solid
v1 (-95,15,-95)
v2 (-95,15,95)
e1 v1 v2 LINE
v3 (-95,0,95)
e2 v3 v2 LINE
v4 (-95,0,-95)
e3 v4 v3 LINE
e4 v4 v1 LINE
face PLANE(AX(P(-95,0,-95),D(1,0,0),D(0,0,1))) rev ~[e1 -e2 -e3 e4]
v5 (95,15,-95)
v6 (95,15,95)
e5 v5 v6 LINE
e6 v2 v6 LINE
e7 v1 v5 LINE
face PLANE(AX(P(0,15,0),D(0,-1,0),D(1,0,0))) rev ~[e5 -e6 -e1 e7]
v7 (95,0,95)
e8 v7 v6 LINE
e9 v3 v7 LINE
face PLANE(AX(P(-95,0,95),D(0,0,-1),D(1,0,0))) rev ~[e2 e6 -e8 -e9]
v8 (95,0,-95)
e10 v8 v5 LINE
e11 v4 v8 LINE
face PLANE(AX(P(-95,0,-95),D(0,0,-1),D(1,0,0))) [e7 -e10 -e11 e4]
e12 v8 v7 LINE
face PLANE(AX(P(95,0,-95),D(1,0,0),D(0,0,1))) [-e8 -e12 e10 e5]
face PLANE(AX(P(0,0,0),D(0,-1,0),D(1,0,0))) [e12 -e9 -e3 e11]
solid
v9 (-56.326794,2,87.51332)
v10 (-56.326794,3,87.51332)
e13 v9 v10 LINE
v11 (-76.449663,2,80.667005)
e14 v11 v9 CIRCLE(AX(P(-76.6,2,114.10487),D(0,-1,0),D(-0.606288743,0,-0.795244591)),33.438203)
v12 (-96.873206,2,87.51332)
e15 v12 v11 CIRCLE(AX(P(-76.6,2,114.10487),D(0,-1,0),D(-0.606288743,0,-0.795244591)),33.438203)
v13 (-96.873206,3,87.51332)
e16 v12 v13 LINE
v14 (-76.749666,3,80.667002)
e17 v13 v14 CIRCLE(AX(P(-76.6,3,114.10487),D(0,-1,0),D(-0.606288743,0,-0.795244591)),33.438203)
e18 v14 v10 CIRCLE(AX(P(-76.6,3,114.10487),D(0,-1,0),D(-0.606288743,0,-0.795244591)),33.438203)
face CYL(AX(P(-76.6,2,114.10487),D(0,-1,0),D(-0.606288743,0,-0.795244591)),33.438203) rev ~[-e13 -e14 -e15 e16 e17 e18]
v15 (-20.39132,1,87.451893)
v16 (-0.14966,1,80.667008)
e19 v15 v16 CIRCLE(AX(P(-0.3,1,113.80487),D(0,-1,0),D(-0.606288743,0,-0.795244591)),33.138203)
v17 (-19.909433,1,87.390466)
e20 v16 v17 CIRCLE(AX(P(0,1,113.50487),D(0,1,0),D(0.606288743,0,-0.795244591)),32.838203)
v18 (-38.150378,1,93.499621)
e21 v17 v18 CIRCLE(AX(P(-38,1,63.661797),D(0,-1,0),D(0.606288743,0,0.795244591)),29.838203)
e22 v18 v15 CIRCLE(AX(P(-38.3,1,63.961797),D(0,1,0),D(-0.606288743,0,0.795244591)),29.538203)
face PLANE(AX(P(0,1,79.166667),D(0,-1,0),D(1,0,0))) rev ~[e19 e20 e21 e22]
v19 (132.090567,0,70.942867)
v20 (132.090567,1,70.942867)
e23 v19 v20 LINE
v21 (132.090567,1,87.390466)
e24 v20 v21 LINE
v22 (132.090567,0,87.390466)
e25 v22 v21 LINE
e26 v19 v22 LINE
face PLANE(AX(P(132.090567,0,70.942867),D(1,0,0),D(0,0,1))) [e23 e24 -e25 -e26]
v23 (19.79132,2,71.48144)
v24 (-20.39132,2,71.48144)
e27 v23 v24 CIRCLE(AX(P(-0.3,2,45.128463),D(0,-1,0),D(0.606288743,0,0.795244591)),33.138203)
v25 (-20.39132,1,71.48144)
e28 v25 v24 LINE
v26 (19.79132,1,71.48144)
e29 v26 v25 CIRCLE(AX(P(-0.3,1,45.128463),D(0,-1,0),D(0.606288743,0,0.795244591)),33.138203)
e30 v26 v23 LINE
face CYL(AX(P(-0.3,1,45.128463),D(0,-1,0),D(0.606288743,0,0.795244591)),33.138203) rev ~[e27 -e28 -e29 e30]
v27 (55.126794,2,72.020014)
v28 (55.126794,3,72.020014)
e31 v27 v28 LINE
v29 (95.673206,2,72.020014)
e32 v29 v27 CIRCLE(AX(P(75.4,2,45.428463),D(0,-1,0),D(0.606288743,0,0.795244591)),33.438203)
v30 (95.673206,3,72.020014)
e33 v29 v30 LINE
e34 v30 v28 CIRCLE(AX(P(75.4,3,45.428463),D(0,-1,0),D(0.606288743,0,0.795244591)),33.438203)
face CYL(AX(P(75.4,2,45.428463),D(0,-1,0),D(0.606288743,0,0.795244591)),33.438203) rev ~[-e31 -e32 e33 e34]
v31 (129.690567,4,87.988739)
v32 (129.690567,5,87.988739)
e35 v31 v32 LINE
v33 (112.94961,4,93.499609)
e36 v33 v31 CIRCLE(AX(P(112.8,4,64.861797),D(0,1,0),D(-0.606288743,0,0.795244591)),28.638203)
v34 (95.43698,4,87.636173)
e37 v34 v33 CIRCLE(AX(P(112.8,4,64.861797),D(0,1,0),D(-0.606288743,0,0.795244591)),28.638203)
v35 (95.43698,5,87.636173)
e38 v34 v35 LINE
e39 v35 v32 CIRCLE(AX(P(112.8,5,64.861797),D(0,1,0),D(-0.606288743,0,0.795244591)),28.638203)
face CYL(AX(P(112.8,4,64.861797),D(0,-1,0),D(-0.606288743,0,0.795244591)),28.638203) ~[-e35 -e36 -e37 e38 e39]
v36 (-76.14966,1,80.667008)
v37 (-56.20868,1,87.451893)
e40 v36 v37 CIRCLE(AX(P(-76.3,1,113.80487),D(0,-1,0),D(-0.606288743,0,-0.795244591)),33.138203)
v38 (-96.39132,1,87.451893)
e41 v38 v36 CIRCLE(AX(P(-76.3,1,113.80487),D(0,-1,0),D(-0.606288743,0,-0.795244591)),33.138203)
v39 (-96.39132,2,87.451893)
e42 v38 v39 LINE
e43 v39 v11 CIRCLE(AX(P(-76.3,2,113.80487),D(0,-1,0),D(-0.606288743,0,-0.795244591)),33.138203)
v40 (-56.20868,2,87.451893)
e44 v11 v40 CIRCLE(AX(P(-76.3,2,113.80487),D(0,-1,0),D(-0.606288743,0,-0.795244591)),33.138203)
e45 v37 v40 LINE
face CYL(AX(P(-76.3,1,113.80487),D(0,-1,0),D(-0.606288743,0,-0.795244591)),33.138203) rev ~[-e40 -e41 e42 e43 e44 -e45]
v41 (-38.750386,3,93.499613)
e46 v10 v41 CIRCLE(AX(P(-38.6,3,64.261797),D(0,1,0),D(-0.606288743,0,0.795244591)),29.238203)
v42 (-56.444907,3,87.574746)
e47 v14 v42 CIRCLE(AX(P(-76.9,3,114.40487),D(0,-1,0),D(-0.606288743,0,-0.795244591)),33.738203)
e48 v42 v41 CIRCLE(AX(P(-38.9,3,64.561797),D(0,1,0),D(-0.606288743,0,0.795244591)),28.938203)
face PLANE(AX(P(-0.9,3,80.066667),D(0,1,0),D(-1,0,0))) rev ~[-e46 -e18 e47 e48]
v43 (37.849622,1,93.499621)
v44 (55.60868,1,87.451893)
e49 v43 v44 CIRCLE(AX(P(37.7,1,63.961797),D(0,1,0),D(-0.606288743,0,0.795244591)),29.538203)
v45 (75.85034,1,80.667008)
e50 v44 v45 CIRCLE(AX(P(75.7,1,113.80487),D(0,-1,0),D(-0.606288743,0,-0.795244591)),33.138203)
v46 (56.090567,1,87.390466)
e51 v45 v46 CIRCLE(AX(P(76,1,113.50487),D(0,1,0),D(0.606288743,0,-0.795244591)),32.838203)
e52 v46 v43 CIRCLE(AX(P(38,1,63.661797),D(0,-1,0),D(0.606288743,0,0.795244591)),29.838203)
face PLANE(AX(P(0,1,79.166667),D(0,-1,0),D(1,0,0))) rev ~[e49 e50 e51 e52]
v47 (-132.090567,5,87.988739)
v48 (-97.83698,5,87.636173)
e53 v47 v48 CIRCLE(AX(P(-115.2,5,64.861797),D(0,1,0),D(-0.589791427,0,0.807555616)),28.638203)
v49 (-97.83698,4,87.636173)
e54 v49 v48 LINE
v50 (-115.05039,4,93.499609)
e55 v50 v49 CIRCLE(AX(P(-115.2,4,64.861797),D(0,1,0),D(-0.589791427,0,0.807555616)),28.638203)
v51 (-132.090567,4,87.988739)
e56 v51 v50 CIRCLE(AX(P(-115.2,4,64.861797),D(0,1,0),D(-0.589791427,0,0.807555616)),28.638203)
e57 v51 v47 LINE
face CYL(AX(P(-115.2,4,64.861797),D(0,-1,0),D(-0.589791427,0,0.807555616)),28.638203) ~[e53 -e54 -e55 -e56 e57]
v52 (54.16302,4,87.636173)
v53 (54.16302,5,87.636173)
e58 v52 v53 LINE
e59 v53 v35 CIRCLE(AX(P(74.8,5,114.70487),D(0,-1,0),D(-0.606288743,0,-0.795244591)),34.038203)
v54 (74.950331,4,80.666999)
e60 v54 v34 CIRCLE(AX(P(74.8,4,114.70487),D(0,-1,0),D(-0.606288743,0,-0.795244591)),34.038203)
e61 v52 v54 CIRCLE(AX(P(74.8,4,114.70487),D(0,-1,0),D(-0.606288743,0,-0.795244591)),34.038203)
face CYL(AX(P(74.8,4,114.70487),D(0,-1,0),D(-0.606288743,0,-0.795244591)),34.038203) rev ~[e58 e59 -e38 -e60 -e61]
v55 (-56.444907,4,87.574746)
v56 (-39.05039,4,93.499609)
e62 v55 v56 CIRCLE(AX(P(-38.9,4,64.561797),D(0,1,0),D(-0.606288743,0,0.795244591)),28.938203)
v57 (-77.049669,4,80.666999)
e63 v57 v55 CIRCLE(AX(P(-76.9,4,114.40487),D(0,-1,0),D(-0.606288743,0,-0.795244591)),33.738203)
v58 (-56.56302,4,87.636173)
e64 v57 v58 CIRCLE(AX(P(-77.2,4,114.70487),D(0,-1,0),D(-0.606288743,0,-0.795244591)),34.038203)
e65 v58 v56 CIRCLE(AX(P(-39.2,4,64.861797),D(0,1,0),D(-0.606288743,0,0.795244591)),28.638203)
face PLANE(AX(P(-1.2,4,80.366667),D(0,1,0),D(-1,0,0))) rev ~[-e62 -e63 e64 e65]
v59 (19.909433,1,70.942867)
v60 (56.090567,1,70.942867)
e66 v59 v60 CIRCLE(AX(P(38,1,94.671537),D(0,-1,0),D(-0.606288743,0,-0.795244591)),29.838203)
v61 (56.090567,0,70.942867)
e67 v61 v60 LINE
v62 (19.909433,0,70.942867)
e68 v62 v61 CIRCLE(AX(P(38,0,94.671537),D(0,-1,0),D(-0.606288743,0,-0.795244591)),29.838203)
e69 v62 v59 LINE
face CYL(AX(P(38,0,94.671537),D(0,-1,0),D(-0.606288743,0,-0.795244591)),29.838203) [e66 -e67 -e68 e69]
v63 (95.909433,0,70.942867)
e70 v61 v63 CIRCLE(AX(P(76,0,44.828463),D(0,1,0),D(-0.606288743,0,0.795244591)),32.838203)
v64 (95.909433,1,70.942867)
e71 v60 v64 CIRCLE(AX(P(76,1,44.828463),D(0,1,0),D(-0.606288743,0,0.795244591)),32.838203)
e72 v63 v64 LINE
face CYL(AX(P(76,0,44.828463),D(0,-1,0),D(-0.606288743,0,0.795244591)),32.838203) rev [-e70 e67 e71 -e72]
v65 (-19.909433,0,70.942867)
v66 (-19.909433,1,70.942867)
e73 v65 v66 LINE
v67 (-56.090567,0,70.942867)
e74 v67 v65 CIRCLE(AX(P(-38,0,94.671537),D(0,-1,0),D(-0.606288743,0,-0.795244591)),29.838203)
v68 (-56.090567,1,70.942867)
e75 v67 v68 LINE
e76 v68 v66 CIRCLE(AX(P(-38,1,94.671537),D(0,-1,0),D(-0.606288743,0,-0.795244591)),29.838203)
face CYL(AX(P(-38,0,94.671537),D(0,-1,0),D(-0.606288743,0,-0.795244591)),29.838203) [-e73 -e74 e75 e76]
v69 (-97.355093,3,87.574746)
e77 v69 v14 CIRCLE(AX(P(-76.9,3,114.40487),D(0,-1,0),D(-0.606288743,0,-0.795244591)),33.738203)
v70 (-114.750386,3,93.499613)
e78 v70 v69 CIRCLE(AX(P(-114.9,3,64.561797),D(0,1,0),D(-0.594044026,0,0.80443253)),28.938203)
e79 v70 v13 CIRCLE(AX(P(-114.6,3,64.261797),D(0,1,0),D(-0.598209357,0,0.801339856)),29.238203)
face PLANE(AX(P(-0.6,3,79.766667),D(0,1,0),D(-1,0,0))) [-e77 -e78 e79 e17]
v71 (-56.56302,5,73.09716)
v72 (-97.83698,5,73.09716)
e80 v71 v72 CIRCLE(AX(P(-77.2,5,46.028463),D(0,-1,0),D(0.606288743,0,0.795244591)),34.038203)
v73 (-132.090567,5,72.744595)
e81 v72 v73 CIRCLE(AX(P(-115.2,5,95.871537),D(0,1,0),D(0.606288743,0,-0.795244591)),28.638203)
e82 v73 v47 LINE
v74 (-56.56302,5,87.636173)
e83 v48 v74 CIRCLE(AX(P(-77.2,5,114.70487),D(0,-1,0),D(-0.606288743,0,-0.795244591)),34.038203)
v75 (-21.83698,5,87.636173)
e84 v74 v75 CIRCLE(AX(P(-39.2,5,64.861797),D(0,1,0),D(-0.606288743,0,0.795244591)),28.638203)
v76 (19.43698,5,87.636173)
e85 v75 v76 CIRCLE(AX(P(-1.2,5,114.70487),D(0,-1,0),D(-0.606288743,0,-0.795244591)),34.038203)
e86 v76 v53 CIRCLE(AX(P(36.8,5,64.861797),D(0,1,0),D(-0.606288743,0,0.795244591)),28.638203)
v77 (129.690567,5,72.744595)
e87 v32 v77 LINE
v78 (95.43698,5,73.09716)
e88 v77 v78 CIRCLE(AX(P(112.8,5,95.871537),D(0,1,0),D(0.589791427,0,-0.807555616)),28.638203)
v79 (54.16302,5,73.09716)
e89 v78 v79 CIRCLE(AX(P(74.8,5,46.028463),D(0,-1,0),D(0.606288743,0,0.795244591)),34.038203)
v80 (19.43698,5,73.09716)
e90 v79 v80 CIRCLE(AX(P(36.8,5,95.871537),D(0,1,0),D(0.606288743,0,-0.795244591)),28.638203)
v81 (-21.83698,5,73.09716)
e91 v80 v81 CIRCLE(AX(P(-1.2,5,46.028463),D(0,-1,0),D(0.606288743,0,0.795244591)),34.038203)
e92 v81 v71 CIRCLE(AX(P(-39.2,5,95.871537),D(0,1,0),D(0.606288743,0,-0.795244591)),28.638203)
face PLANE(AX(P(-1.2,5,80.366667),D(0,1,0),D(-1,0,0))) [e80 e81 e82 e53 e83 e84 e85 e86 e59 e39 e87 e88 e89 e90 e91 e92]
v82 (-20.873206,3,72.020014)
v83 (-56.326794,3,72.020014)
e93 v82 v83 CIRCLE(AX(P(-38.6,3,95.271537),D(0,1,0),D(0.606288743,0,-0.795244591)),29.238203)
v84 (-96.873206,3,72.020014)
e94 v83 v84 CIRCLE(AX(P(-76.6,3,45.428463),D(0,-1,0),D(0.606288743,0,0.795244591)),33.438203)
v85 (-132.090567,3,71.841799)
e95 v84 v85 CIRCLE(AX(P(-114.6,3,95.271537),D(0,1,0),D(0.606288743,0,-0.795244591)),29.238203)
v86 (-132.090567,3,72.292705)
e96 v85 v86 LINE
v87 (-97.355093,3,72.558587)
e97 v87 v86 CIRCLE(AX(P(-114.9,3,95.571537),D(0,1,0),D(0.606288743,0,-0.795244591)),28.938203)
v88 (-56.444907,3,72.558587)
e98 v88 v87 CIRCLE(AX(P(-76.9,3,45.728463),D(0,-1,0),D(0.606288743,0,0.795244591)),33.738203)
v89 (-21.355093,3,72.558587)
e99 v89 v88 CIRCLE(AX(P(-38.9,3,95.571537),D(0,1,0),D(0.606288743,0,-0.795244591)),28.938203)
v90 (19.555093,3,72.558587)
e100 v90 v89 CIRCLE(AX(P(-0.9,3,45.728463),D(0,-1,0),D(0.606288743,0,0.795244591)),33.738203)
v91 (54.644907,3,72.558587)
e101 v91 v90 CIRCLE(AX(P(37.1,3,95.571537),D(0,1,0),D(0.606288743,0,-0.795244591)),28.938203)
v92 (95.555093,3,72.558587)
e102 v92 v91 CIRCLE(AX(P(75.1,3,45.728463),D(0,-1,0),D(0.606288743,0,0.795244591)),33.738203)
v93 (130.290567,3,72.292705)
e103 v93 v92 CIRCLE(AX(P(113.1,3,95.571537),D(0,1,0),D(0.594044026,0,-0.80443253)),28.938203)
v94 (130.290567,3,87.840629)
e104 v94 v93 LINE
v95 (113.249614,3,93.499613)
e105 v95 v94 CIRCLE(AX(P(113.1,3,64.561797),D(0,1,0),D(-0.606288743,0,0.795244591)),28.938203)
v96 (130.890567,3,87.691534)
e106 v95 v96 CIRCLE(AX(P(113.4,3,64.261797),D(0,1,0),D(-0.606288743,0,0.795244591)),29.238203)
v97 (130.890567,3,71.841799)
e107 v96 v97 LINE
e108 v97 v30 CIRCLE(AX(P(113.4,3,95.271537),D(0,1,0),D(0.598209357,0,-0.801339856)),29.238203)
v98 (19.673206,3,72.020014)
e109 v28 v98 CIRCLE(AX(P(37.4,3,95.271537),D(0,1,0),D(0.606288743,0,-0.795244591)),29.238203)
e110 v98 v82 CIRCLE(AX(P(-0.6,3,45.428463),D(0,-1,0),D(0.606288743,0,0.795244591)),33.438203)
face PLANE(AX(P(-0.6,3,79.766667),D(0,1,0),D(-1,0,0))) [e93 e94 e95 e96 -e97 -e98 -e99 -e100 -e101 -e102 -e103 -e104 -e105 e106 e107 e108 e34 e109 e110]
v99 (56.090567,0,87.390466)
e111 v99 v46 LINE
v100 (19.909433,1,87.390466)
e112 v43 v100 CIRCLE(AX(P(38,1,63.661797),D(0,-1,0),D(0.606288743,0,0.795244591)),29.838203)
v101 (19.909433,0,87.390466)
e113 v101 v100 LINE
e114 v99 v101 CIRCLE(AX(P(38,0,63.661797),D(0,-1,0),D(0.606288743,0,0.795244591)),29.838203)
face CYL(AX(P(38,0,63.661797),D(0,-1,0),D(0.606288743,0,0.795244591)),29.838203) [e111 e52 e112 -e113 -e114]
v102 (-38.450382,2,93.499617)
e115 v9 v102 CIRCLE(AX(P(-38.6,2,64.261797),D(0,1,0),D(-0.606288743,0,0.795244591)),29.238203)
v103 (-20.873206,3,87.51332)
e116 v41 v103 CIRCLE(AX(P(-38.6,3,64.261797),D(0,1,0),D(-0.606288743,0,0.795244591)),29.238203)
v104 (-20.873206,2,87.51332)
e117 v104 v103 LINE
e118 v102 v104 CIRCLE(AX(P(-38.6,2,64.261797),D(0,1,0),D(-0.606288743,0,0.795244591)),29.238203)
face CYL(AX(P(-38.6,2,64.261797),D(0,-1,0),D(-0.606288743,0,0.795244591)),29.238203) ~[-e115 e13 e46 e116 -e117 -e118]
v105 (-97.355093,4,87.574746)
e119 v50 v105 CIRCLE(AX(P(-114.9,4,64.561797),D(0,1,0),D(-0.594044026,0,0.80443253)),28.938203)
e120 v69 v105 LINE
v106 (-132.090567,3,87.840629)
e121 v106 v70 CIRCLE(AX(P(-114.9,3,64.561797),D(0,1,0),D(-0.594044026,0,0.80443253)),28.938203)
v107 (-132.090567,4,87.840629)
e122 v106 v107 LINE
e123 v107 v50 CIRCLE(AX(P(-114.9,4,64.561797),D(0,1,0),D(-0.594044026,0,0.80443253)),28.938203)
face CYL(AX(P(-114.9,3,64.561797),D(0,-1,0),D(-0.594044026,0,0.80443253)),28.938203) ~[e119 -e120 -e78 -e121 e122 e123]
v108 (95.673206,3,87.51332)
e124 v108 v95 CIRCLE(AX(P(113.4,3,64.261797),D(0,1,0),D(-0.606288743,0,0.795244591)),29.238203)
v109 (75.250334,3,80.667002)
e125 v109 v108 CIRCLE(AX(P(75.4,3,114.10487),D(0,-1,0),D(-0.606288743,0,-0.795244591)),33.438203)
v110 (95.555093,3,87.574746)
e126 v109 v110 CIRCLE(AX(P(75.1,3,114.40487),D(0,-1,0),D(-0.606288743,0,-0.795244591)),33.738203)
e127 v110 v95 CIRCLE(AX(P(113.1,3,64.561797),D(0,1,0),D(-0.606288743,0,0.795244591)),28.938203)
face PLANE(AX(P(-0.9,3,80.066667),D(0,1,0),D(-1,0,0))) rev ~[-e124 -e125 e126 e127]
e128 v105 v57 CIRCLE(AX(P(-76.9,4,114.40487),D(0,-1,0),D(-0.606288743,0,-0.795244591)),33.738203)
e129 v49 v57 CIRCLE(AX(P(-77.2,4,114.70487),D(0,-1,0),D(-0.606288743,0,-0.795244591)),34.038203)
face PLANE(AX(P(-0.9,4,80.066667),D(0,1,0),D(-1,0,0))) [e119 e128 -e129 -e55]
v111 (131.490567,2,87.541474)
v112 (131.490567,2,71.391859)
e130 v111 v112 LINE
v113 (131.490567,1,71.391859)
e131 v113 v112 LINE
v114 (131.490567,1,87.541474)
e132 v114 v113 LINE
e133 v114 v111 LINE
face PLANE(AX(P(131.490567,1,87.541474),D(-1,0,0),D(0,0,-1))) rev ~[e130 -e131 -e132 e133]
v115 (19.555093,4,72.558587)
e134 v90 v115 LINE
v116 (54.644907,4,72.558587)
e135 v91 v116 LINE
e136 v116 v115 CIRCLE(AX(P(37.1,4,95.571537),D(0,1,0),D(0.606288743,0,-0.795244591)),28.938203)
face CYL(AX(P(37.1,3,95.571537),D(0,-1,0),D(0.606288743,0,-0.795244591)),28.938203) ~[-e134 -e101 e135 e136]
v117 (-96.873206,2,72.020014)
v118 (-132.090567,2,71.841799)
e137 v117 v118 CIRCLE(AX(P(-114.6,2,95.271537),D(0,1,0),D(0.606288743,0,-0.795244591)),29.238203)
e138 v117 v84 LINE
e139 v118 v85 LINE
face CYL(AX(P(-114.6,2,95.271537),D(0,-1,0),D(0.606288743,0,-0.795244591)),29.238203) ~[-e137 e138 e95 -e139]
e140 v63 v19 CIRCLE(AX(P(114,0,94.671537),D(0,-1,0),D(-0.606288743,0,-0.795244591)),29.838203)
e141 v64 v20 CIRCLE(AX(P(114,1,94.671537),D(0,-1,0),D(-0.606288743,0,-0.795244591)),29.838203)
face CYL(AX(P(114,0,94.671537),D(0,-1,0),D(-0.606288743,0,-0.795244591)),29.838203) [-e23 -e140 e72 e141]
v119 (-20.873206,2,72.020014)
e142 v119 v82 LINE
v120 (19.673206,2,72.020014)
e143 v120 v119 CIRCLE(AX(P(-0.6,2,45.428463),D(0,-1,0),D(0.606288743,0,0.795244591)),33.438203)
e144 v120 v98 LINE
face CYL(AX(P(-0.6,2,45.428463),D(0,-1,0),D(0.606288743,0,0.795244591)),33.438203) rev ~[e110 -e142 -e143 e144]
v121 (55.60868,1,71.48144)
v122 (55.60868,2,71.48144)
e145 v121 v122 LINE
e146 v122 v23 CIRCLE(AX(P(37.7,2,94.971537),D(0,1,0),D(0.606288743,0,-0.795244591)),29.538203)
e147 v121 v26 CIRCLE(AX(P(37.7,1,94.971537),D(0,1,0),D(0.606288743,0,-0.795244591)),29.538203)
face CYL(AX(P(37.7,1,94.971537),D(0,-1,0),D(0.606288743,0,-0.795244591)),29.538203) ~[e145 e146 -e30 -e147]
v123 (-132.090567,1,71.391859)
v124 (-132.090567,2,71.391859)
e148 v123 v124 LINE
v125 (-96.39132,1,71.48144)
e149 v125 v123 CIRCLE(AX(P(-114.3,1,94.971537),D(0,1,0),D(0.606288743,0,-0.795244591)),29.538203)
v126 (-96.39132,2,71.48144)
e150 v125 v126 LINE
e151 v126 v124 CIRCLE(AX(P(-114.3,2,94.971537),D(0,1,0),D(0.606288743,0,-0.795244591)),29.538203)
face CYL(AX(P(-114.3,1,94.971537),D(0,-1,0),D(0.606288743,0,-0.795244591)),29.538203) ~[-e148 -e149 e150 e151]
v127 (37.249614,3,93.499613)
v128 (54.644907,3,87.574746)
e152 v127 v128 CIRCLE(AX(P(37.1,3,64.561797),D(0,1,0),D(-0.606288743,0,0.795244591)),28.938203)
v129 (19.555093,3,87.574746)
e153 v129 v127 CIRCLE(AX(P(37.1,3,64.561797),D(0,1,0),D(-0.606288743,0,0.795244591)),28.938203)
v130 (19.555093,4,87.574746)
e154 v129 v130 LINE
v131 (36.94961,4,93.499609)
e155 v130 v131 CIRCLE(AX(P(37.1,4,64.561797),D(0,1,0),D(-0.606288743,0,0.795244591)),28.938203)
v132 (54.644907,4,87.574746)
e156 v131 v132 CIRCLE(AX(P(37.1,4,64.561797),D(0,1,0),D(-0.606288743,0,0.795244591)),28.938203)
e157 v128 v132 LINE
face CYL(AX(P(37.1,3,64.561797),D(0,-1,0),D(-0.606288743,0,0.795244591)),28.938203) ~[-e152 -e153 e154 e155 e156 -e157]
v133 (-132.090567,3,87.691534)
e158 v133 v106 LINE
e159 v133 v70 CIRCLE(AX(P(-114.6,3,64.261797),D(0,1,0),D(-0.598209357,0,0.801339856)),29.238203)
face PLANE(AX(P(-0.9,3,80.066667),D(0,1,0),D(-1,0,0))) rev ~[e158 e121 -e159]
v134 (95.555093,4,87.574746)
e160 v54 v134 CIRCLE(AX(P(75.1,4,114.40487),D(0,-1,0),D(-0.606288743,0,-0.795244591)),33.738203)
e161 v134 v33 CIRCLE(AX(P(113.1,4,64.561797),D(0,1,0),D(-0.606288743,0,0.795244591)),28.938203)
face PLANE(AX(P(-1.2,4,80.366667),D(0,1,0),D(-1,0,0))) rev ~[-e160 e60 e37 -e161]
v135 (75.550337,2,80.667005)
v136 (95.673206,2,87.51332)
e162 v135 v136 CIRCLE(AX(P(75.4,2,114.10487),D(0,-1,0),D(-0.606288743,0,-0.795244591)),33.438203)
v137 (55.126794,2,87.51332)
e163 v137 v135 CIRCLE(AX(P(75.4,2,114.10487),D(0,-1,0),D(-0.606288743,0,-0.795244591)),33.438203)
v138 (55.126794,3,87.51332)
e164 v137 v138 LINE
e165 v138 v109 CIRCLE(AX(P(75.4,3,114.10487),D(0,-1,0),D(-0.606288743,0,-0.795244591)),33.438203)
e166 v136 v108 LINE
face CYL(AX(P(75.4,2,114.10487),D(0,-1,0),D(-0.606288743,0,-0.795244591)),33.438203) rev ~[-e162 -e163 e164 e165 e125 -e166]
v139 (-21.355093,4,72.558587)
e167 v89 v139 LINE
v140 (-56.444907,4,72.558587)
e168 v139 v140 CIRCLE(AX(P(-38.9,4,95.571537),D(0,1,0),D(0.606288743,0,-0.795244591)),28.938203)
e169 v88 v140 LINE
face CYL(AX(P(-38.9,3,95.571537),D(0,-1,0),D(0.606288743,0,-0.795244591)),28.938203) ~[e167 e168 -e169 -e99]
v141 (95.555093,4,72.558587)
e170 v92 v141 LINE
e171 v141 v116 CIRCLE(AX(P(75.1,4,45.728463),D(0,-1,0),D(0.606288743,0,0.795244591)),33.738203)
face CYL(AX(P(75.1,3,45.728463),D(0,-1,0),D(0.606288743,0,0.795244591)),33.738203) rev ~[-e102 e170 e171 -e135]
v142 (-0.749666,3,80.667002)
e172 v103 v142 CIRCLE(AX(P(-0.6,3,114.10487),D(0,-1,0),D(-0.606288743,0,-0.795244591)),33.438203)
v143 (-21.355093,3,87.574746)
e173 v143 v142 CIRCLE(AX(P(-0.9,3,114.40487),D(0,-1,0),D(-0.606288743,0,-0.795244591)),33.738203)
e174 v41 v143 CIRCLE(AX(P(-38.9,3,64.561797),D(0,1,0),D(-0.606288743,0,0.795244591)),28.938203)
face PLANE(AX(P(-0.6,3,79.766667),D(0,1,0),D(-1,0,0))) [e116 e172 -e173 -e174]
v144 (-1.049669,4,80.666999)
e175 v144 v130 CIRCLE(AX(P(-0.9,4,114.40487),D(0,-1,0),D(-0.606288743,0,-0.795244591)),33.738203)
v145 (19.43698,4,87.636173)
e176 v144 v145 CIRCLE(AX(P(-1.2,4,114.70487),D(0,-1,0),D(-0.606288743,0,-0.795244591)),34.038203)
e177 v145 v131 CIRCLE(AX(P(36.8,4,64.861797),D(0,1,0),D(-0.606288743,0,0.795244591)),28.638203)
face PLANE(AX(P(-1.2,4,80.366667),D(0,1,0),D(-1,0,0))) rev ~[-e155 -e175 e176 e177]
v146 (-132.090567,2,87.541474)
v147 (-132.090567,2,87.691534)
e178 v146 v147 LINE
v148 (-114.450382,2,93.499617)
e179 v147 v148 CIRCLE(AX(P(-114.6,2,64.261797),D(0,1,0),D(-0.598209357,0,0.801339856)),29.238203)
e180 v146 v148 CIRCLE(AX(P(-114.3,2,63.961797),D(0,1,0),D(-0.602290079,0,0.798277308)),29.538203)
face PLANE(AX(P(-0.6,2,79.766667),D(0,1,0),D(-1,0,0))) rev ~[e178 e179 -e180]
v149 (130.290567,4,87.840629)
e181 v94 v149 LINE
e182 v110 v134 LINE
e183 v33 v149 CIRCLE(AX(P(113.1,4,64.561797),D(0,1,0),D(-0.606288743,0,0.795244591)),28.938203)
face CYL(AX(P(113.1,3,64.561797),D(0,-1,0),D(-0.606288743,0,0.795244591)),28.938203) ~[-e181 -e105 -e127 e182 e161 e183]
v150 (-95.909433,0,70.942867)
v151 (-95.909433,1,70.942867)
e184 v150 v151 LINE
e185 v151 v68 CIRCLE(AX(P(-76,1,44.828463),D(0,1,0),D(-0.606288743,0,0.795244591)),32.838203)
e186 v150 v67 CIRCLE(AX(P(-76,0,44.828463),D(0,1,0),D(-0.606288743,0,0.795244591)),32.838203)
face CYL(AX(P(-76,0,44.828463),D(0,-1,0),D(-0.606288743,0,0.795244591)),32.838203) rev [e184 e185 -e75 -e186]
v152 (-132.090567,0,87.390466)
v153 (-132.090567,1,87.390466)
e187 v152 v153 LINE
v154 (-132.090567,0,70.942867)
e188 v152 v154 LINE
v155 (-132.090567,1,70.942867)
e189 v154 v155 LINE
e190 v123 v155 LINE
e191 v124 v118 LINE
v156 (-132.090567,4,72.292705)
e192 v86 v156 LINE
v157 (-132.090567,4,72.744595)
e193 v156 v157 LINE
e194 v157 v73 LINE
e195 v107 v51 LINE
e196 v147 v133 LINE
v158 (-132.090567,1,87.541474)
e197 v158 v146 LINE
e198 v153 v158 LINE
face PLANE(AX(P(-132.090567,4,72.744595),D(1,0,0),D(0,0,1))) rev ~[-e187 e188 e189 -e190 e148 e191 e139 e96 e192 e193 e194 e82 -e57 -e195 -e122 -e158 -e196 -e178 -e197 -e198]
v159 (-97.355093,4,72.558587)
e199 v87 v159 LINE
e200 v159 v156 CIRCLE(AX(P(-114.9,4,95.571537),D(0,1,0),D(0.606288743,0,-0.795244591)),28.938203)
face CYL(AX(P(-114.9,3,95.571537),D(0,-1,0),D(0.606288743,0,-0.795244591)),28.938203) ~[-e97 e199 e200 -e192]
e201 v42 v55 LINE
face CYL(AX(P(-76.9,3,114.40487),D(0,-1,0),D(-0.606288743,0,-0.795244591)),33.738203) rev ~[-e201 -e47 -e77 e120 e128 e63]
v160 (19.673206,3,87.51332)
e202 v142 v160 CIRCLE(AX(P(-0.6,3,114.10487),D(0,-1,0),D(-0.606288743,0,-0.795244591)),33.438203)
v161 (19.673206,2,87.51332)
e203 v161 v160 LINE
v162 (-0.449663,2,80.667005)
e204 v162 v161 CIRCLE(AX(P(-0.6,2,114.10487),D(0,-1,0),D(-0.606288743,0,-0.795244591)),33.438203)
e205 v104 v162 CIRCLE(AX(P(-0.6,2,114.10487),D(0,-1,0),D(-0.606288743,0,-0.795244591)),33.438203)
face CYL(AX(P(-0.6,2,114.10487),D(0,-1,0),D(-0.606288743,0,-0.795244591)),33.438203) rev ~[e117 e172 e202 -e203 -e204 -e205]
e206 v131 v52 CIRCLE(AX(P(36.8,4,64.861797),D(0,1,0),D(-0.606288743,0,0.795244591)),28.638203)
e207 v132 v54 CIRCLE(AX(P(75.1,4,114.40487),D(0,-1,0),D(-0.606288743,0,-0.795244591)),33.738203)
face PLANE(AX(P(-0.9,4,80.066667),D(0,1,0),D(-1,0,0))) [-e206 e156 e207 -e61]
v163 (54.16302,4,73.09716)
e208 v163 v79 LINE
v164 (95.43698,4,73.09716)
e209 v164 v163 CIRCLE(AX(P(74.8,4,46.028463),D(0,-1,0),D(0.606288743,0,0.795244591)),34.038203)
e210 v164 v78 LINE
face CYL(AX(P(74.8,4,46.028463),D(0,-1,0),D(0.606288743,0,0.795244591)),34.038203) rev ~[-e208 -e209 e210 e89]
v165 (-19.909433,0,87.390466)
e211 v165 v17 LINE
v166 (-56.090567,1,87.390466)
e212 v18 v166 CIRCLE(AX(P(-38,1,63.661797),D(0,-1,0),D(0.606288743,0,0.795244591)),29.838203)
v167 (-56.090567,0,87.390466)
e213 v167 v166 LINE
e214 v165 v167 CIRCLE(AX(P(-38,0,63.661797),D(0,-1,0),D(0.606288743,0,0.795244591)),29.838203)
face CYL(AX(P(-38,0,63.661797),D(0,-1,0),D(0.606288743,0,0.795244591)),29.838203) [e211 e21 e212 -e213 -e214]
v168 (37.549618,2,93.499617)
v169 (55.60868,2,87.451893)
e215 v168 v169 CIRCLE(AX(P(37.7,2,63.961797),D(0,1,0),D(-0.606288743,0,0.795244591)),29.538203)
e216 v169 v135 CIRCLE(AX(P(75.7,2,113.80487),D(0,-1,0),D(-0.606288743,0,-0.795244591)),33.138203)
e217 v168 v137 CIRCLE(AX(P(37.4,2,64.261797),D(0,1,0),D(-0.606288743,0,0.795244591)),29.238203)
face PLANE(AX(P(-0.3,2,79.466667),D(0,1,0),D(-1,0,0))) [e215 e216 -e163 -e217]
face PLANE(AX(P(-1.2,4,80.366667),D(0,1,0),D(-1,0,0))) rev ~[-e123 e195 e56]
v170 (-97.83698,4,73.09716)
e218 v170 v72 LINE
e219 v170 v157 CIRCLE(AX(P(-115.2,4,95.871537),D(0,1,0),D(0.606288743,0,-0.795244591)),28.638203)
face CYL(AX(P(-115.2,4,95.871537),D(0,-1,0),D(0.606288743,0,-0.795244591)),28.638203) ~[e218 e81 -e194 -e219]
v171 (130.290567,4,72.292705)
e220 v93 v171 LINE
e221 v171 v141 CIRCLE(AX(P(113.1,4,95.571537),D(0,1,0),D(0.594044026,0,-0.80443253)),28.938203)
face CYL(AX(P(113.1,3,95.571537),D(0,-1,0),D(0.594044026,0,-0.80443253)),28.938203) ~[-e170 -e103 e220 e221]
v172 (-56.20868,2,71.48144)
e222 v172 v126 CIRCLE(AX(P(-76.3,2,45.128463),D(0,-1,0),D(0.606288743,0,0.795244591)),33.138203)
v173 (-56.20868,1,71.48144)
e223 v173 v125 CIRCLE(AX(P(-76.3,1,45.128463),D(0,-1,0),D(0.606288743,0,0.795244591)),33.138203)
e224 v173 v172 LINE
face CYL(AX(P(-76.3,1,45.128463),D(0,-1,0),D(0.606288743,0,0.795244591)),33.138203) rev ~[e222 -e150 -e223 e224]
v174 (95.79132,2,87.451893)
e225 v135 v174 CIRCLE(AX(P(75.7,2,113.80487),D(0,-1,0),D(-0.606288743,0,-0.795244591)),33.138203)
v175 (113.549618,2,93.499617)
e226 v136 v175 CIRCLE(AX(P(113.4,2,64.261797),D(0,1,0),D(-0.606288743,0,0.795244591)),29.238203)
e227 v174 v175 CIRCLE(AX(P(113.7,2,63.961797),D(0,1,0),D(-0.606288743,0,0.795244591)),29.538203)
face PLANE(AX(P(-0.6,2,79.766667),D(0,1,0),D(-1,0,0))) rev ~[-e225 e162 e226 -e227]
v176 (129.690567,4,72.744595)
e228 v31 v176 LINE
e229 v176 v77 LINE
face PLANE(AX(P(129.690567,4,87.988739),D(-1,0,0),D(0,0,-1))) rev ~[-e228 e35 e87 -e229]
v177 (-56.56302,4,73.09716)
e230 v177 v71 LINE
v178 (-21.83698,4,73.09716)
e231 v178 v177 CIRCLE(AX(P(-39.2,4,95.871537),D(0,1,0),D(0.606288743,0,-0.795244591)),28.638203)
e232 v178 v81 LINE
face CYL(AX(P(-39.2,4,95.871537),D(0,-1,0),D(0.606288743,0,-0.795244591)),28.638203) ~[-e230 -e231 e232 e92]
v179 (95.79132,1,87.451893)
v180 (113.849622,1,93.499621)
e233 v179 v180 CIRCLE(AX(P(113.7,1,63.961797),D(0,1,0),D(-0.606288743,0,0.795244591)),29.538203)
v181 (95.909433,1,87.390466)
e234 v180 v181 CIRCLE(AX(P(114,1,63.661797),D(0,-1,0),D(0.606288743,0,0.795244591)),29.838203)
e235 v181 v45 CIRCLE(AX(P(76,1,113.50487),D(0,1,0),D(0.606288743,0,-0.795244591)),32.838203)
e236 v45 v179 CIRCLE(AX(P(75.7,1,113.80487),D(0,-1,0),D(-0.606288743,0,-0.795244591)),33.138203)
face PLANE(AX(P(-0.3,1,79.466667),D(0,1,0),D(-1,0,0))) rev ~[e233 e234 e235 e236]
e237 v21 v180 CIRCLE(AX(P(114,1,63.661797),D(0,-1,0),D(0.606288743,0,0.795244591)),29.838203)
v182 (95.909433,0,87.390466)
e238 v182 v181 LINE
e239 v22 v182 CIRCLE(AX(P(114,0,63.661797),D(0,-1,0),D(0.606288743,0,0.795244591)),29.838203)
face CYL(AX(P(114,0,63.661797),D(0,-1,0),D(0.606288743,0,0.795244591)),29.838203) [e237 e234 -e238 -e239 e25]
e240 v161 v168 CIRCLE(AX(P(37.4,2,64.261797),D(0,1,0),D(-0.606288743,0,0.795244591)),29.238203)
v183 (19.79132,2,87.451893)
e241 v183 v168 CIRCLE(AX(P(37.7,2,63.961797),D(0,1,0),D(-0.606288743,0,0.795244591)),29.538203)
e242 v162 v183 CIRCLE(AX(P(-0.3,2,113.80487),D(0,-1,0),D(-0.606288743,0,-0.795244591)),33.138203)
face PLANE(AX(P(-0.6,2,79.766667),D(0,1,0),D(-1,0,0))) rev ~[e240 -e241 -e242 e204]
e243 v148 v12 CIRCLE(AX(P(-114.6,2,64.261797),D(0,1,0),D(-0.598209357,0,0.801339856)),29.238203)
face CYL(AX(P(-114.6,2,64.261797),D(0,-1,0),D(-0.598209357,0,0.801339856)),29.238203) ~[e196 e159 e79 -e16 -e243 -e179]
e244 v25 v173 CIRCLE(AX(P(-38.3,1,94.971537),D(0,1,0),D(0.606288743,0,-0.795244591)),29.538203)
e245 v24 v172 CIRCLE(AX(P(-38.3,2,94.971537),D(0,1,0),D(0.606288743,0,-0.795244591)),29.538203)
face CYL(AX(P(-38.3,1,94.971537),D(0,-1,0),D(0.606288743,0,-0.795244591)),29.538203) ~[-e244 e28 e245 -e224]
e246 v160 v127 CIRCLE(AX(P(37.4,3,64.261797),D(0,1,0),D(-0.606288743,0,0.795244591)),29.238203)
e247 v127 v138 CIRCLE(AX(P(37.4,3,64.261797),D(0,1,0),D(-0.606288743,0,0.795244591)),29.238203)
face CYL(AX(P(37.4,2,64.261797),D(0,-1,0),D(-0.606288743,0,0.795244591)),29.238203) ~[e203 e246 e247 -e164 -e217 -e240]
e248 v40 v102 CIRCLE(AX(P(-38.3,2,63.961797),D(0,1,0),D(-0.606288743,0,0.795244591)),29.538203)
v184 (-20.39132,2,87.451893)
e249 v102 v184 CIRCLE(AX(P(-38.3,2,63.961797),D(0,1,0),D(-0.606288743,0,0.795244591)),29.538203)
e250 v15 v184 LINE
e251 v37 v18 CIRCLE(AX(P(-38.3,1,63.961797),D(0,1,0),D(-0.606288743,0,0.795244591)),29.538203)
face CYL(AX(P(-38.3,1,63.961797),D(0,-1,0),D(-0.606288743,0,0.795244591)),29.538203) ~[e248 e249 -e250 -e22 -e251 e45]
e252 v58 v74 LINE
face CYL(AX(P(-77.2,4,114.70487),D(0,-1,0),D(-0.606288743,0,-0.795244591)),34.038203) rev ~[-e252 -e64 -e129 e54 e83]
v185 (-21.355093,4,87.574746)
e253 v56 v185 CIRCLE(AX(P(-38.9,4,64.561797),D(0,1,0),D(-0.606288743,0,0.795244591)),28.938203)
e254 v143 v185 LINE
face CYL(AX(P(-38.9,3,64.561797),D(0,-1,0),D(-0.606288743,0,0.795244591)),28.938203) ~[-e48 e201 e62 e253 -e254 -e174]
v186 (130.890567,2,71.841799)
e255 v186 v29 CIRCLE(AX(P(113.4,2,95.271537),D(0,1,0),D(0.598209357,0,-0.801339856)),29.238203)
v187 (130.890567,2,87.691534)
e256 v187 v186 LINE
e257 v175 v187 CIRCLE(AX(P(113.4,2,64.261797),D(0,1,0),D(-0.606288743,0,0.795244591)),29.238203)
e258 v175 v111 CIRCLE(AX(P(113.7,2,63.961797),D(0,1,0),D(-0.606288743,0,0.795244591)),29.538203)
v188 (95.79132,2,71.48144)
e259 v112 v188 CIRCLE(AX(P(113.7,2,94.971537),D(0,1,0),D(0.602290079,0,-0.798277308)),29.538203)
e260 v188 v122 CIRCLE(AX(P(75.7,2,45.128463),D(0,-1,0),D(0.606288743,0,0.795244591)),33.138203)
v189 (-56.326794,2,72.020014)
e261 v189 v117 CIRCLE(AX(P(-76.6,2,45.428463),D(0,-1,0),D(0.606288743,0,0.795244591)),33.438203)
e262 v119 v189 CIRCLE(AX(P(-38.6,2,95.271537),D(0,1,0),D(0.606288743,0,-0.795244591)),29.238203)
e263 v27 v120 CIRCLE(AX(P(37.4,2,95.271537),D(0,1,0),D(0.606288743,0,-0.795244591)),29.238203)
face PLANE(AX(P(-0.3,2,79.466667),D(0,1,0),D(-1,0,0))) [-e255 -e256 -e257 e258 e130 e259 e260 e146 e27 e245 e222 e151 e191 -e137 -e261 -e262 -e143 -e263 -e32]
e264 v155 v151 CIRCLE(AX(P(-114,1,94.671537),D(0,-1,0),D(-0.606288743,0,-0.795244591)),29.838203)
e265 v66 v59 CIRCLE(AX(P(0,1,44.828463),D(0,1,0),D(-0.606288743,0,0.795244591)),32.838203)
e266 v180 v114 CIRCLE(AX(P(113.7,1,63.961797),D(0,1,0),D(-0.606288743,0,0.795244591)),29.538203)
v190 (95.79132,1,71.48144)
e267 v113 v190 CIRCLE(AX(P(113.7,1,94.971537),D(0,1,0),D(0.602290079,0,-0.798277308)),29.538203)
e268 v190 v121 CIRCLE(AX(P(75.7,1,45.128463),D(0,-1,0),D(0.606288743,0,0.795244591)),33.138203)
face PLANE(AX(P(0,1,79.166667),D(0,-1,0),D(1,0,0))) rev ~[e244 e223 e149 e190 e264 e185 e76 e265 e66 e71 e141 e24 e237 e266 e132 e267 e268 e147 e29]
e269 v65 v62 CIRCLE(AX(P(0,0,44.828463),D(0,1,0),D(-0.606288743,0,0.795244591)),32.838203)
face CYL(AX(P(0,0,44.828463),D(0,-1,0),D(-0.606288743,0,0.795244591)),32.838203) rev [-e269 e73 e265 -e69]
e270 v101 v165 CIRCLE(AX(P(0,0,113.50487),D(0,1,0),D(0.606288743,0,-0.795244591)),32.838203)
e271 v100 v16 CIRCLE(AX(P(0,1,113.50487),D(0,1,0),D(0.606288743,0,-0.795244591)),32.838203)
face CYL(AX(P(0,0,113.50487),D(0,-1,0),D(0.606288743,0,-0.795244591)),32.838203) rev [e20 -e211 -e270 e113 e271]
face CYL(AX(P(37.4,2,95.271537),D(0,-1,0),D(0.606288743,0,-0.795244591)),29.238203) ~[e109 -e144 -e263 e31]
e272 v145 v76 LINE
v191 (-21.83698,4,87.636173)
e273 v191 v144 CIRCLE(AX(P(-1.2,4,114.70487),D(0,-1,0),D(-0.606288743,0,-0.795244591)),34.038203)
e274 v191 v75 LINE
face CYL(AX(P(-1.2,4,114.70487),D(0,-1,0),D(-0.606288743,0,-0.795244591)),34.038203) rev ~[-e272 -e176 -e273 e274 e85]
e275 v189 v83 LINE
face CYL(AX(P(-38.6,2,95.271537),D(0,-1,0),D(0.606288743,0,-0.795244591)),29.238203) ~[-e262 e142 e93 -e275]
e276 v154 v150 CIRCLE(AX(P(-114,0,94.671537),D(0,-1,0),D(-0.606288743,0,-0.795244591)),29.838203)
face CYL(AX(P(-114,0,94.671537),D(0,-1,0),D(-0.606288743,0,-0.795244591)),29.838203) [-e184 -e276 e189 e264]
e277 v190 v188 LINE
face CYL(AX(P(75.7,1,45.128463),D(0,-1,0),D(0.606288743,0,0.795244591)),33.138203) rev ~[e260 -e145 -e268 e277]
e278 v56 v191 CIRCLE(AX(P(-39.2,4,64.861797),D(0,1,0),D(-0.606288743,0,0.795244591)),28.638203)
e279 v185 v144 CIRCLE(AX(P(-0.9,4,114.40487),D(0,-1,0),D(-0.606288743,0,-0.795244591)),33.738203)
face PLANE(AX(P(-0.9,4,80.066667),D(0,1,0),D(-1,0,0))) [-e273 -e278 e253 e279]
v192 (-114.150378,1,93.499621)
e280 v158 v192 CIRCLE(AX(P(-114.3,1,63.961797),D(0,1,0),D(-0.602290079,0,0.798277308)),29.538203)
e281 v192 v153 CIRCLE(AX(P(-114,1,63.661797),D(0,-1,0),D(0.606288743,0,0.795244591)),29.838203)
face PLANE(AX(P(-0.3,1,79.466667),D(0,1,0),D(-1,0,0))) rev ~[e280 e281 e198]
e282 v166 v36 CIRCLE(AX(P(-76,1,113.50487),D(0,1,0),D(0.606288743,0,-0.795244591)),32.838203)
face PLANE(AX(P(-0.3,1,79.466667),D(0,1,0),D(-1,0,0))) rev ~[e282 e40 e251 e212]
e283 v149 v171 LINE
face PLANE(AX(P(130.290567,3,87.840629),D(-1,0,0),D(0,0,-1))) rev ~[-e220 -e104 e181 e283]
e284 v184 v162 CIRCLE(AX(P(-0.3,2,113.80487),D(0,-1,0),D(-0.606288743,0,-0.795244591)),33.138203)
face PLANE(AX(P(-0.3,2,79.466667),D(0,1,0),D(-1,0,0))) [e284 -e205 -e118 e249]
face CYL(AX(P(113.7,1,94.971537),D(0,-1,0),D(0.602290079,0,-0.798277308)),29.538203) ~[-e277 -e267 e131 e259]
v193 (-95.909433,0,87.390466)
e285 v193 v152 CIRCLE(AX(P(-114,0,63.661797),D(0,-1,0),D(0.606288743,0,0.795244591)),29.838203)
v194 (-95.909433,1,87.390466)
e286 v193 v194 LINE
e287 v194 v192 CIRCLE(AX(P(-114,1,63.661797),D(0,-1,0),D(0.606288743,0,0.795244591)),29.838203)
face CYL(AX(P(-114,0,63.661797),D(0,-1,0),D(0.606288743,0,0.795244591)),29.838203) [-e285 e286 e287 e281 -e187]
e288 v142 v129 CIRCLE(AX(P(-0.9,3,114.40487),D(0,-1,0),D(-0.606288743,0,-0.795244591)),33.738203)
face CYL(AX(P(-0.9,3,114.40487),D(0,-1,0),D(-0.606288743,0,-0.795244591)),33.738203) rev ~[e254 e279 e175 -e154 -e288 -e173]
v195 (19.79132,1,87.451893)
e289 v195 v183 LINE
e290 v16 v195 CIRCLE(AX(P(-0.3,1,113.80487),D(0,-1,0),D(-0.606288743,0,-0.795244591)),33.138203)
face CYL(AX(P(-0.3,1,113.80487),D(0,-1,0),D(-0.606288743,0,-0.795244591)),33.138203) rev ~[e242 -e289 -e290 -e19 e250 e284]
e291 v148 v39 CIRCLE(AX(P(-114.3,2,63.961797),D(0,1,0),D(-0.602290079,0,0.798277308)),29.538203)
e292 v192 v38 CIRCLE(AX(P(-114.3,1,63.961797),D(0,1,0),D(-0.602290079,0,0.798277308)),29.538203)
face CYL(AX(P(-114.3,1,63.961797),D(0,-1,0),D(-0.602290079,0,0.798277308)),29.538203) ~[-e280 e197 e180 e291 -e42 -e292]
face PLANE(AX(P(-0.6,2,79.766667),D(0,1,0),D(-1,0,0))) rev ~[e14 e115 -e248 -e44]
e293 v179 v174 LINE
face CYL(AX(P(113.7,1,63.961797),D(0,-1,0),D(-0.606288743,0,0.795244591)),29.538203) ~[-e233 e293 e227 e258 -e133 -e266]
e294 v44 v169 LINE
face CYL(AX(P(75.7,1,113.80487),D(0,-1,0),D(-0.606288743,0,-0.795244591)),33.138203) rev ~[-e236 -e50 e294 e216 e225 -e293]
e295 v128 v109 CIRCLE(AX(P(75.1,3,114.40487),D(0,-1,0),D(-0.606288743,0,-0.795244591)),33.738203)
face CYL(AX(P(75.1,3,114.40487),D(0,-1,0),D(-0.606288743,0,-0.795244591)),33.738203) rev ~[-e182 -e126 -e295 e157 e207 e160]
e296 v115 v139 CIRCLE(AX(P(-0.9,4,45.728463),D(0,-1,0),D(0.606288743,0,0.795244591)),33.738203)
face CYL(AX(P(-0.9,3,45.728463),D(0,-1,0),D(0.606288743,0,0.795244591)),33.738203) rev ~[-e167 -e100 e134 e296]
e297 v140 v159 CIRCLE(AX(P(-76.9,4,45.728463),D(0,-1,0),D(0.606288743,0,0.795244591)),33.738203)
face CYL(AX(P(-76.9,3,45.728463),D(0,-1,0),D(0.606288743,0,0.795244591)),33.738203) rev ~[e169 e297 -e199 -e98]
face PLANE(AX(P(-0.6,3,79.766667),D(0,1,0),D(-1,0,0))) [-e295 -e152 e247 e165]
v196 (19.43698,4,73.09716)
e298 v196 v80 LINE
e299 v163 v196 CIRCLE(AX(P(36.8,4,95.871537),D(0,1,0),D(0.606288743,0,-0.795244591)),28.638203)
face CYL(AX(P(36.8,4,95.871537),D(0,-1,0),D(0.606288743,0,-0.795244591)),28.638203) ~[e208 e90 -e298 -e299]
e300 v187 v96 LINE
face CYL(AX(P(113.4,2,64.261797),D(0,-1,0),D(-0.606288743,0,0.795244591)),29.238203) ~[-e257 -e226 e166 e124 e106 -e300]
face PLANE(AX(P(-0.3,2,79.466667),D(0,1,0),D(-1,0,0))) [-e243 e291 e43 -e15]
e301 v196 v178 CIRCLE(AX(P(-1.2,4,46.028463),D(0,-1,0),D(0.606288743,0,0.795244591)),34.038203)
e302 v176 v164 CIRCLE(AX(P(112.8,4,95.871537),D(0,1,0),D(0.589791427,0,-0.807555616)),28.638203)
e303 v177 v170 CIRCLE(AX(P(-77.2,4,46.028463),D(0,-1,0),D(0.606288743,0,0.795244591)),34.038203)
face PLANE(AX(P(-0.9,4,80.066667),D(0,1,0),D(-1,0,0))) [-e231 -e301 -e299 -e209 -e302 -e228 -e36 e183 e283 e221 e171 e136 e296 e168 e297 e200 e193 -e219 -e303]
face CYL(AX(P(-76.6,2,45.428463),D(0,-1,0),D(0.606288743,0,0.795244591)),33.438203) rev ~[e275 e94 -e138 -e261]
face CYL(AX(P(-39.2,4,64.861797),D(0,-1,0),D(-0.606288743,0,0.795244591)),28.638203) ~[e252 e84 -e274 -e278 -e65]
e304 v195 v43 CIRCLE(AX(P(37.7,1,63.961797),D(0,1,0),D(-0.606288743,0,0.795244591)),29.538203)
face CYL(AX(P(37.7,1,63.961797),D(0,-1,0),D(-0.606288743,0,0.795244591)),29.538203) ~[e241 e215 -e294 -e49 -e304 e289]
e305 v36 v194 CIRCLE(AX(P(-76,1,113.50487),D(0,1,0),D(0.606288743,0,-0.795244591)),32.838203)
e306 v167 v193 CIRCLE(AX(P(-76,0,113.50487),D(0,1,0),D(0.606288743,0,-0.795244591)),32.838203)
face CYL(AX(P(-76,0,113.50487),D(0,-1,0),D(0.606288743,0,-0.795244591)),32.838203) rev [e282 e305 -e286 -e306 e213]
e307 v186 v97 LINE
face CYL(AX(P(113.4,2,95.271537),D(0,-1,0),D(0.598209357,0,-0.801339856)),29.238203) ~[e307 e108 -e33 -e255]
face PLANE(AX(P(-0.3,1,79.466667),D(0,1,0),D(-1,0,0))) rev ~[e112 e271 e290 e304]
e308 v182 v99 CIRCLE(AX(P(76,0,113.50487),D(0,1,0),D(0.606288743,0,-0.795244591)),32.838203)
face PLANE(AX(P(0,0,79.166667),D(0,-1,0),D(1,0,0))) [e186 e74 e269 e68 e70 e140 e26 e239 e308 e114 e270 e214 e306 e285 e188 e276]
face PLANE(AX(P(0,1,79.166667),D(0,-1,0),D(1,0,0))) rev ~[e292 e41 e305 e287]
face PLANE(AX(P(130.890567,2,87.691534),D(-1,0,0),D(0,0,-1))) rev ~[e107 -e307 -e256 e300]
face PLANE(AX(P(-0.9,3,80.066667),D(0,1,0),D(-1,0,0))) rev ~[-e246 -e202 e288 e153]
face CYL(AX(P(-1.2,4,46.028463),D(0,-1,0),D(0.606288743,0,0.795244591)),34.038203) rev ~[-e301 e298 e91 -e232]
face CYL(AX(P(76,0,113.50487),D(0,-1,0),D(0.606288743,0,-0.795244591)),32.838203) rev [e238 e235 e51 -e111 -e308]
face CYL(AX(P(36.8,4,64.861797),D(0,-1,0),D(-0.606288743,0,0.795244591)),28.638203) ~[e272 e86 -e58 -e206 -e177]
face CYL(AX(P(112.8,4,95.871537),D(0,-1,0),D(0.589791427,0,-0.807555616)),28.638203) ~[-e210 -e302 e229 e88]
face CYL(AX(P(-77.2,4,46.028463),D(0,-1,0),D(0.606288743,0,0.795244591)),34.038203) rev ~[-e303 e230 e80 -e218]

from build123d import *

# Parameters (mm, degrees)
F0_W      = 190
F0_H      = 190
F1_DEPTH  = 15
F3_DEPTH  = 1
F5_DEPTH  = 1
F7_DEPTH  = 1
F9_DEPTH  = 1
F11_DEPTH = 1


with BuildPart() as f1:
    # F0 (on Front) → F1 (new body)
    with BuildSketch(Plane.XZ):
        Rectangle(F0_W, F0_H)
    extrude(amount=-F1_DEPTH)


with BuildPart() as f3:
    # F2 (on face) → F3 (new body)
    with BuildSketch(Plane.XZ):
        with BuildLine():
            ThreePointArc((-56.0905668848, 87.3904664468), (-76, 80.6666666667), (-95.9094331152, 87.3904664468))
            ThreePointArc((-95.9094331152, 87.3904664468), (-114, 93.5), (-132.0905668848, 87.3904664468))
            Line((-132.0905668848, 87.3904664468), (-132.0905668848, 70.9428668865))
            ThreePointArc((-132.0905668848, 70.9428668865), (-114, 64.8333333333), (-95.9094331152, 70.9428668865))
            ThreePointArc((-95.9094331152, 70.9428668865), (-76, 77.6666666667), (-56.0905668848, 70.9428668865))
            ThreePointArc((-56.0905668848, 70.9428668865), (-38, 64.8333333333), (-19.9094331152, 70.9428668865))
            ThreePointArc((-19.9094331152, 70.9428668865), (0, 77.6666666667), (19.9094331152, 70.9428668865))
            ThreePointArc((19.9094331152, 70.9428668865), (38, 64.8333333333), (56.0905668848, 70.9428668865))
            ThreePointArc((56.0905668848, 70.9428668865), (76, 77.6666666667), (95.9094331152, 70.9428668865))
            ThreePointArc((95.9094331152, 70.9428668865), (114, 64.8333333333), (132.0905668848, 70.9428668865))
            Line((132.0905668848, 70.9428668865), (132.0905668848, 87.3904664468))
            ThreePointArc((132.0905668848, 87.3904664468), (114, 93.5), (95.9094331152, 87.3904664468))
            ThreePointArc((95.9094331152, 87.3904664468), (76, 80.6666666667), (56.0905668848, 87.3904664468))
            ThreePointArc((56.0905668848, 87.3904664468), (38, 93.5), (19.9094331152, 87.3904664468))
            ThreePointArc((19.9094331152, 87.3904664468), (0, 80.6666666667), (-19.9094331152, 87.3904664468))
            ThreePointArc((-19.9094331152, 87.3904664468), (-38, 93.5), (-56.0905668848, 87.3904664468))
        make_face()
    extrude(amount=-F3_DEPTH)

    # F4 (on face) → F5 (join)
    with BuildSketch(Plane(origin=(0, 1, 0), x_dir=(-1, 0, 0), z_dir=(0, 1, 0))):
        with BuildLine():
            ThreePointArc((-95.7913197263, 87.4518930814), (-113.6258792589, 93.4999070156), (-131.4905668729, 87.541474107))
            Line((-131.4905668729, 87.541474107), (-131.4905668729, 71.3918592502))
            ThreePointArc((-131.4905668729, 71.3918592502), (-113.6258792589, 65.4334263416), (-95.7913197263, 71.4814402758))
            ThreePointArc((-95.7913197263, 71.4814402758), (-75.6999999881, 78.2666666786), (-55.6086802499, 71.4814402758))
            ThreePointArc((-55.6086802499, 71.4814402758), (-37.6999999881, 65.4333333453), (-19.7913197263, 71.4814402758))
            ThreePointArc((-19.7913197263, 71.4814402758), (0.3000000119, 78.2666666786), (20.3913197501, 71.4814402758))
            ThreePointArc((20.3913197501, 71.4814402758), (38.3000000119, 65.4333333453), (56.2086802737, 71.4814402758))
            ThreePointArc((56.2086802737, 71.4814402758), (76.3000000119, 78.2666666786), (96.3913197501, 71.4814402758))
            ThreePointArc((96.3913197501, 71.4814402758), (114.2258792828, 65.4334263416), (132.0905668967, 71.3918592502))
            Line((132.0905668967, 71.3918592502), (132.0905668967, 87.541474107))
            ThreePointArc((132.0905668967, 87.541474107), (114.2258792828, 93.4999070156), (96.3913197501, 87.4518930814))
            ThreePointArc((96.3913197501, 87.4518930814), (76.3000000119, 80.6666666786), (56.2086802737, 87.4518930814))
            ThreePointArc((56.2086802737, 87.4518930814), (38.3000000119, 93.5000000119), (20.3913197501, 87.4518930814))
            ThreePointArc((20.3913197501, 87.4518930814), (0.3000000119, 80.6666666786), (-19.7913197263, 87.4518930814))
            ThreePointArc((-19.7913197263, 87.4518930814), (-37.6999999881, 93.5000000119), (-55.6086802499, 87.4518930814))
            ThreePointArc((-55.6086802499, 87.4518930814), (-75.6999999881, 80.6666666786), (-95.7913197263, 87.4518930814))
        make_face()
    extrude(amount=F5_DEPTH)

    # F6 (on face) → F7 (join)
    with BuildSketch(Plane(origin=(0, 2, 0), x_dir=(-1, 0, 0), z_dir=(0, 1, 0))):
        with BuildLine():
            ThreePointArc((56.3267936626, 87.513319716), (38.6000000238, 93.5000000238), (20.8732063851, 87.513319716))
            ThreePointArc((20.8732063851, 87.513319716), (0.6000000238, 80.6666666905), (-19.6732063374, 87.513319716))
            ThreePointArc((-19.6732063374, 87.513319716), (-37.3999999762, 93.5000000238), (-55.1267936149, 87.513319716))
            ThreePointArc((-55.1267936149, 87.513319716), (-75.3999999762, 80.6666666905), (-95.6732063374, 87.513319716))
            ThreePointArc((-95.6732063374, 87.513319716), (-113.2520443013, 93.4996256674), (-130.890566861, 87.6915343271))
            Line((-130.890566861, 87.6915343271), (-130.890566861, 71.8417990539))
            ThreePointArc((-130.890566861, 71.8417990539), (-113.2520443013, 66.0337077137), (-95.6732063374, 72.020013665))
            ThreePointArc((-95.6732063374, 72.020013665), (-75.3999999762, 78.8666666905), (-55.1267936149, 72.020013665))
            ThreePointArc((-55.1267936149, 72.020013665), (-37.3999999762, 66.0333333572), (-19.6732063374, 72.020013665))
            ThreePointArc((-19.6732063374, 72.020013665), (0.6000000238, 78.8666666905), (20.8732063851, 72.020013665))
            ThreePointArc((20.8732063851, 72.020013665), (38.6000000238, 66.0333333572), (56.3267936626, 72.020013665))
            ThreePointArc((56.3267936626, 72.020013665), (76.6000000238, 78.8666666905), (96.8732063851, 72.020013665))
            ThreePointArc((96.8732063851, 72.020013665), (114.452044349, 66.0337077137), (132.0905669087, 71.8417990539))
            Line((132.0905669087, 71.8417990539), (132.0905669087, 87.6915343271))
            ThreePointArc((132.0905669087, 87.6915343271), (114.452044349, 93.4996256674), (96.8732063851, 87.513319716))
            ThreePointArc((96.8732063851, 87.513319716), (76.6000000238, 80.6666666905), (56.3267936626, 87.513319716))
        make_face()
    extrude(amount=F7_DEPTH)

    # F8 (on face) → F9 (join)
    with BuildSketch(Plane(origin=(0, 3, 0), x_dir=(-1, 0, 0), z_dir=(0, 1, 0))):
        with BuildLine():
            ThreePointArc((56.4449070515, 87.5747463506), (38.9000000358, 93.5000000358), (21.3550930201, 87.5747463506))
            ThreePointArc((21.3550930201, 87.5747463506), (0.9000000358, 80.6666667024), (-19.5550929485, 87.5747463506))
            ThreePointArc((-19.5550929485, 87.5747463506), (-37.0999999642, 93.5000000358), (-54.6449069799, 87.5747463506))
            ThreePointArc((-54.6449069799, 87.5747463506), (-75.0999999642, 80.6666667024), (-95.5550929485, 87.5747463506))
            ThreePointArc((-95.5550929485, 87.5747463506), (-112.8784991713, 93.49915231), (-130.290566849, 87.8406287996))
            Line((-130.290566849, 87.8406287996), (-130.290566849, 72.2927046052))
            ThreePointArc((-130.290566849, 72.2927046052), (-112.8784991713, 66.6341810948), (-95.5550929485, 72.5585870542))
            ThreePointArc((-95.5550929485, 72.5585870542), (-75.0999999642, 79.4666667024), (-54.6449069799, 72.5585870542))
            ThreePointArc((-54.6449069799, 72.5585870542), (-37.0999999642, 66.6333333691), (-19.5550929485, 72.5585870542))
            ThreePointArc((-19.5550929485, 72.5585870542), (0.9000000358, 79.4666667024), (21.3550930201, 72.5585870542))
            ThreePointArc((21.3550930201, 72.5585870542), (38.9000000358, 66.6333333691), (56.4449070515, 72.5585870542))
            ThreePointArc((56.4449070515, 72.5585870542), (76.9000000358, 79.4666667024), (97.3550930201, 72.5585870542))
            ThreePointArc((97.3550930201, 72.5585870542), (114.6784992428, 66.6341810948), (132.0905669206, 72.2927046052))
            Line((132.0905669206, 72.2927046052), (132.0905669206, 87.8406287996))
            ThreePointArc((132.0905669206, 87.8406287996), (114.6784992428, 93.49915231), (97.3550930201, 87.5747463506))
            ThreePointArc((97.3550930201, 87.5747463506), (76.9000000358, 80.6666667024), (56.4449070515, 87.5747463506))
        make_face()
    extrude(amount=F9_DEPTH)

    # F10 (on face) → F11 (join)
    with BuildSketch(Plane(origin=(0, 4, 0), x_dir=(-1, 0, 0), z_dir=(0, 1, 0))):
        with BuildLine():
            ThreePointArc((-19.4369795597, 87.6361729853), (-36.7999999523, 93.5000000477), (-54.163020345, 87.6361729853))
            ThreePointArc((-54.163020345, 87.6361729853), (-74.7999999523, 80.6666667144), (-95.4369795597, 87.6361729853))
            ThreePointArc((-95.4369795597, 87.6361729853), (-112.5052480041, 93.4984831751), (-129.6905668371, 87.9887386199))
            Line((-129.6905668371, 87.9887386199), (-129.6905668371, 72.7445948088))
            ThreePointArc((-129.6905668371, 72.7445948088), (-112.5052480041, 67.2348502536), (-95.4369795597, 73.0971604434))
            ThreePointArc((-95.4369795597, 73.0971604434), (-74.7999999523, 80.0666667144), (-54.163020345, 73.0971604434))
            ThreePointArc((-54.163020345, 73.0971604434), (-36.7999999523, 67.233333381), (-19.4369795597, 73.0971604434))
            ThreePointArc((-19.4369795597, 73.0971604434), (1.2000000477, 80.0666667144), (21.836979655, 73.0971604434))
            ThreePointArc((21.836979655, 73.0971604434), (39.2000000477, 67.233333381), (56.5630204403, 73.0971604434))
            ThreePointArc((56.5630204403, 73.0971604434), (77.2000000477, 80.0666667144), (97.836979655, 73.0971604434))
            ThreePointArc((97.836979655, 73.0971604434), (114.9052480995, 67.2348502536), (132.0905669325, 72.7445948088))
            Line((132.0905669325, 72.7445948088), (132.0905669325, 87.9887386199))
            ThreePointArc((132.0905669325, 87.9887386199), (114.9052480995, 93.4984831751), (97.836979655, 87.6361729853))
            ThreePointArc((97.836979655, 87.6361729853), (77.2000000477, 80.6666667144), (56.5630204403, 87.6361729853))
            ThreePointArc((56.5630204403, 87.6361729853), (39.2000000477, 93.5000000477), (21.836979655, 87.6361729853))
            ThreePointArc((21.836979655, 87.6361729853), (1.2000000477, 80.6666667144), (-19.4369795597, 87.6361729853))
        make_face()
    extrude(amount=F11_DEPTH)


solid = Compound([f1.part, f3.part])
